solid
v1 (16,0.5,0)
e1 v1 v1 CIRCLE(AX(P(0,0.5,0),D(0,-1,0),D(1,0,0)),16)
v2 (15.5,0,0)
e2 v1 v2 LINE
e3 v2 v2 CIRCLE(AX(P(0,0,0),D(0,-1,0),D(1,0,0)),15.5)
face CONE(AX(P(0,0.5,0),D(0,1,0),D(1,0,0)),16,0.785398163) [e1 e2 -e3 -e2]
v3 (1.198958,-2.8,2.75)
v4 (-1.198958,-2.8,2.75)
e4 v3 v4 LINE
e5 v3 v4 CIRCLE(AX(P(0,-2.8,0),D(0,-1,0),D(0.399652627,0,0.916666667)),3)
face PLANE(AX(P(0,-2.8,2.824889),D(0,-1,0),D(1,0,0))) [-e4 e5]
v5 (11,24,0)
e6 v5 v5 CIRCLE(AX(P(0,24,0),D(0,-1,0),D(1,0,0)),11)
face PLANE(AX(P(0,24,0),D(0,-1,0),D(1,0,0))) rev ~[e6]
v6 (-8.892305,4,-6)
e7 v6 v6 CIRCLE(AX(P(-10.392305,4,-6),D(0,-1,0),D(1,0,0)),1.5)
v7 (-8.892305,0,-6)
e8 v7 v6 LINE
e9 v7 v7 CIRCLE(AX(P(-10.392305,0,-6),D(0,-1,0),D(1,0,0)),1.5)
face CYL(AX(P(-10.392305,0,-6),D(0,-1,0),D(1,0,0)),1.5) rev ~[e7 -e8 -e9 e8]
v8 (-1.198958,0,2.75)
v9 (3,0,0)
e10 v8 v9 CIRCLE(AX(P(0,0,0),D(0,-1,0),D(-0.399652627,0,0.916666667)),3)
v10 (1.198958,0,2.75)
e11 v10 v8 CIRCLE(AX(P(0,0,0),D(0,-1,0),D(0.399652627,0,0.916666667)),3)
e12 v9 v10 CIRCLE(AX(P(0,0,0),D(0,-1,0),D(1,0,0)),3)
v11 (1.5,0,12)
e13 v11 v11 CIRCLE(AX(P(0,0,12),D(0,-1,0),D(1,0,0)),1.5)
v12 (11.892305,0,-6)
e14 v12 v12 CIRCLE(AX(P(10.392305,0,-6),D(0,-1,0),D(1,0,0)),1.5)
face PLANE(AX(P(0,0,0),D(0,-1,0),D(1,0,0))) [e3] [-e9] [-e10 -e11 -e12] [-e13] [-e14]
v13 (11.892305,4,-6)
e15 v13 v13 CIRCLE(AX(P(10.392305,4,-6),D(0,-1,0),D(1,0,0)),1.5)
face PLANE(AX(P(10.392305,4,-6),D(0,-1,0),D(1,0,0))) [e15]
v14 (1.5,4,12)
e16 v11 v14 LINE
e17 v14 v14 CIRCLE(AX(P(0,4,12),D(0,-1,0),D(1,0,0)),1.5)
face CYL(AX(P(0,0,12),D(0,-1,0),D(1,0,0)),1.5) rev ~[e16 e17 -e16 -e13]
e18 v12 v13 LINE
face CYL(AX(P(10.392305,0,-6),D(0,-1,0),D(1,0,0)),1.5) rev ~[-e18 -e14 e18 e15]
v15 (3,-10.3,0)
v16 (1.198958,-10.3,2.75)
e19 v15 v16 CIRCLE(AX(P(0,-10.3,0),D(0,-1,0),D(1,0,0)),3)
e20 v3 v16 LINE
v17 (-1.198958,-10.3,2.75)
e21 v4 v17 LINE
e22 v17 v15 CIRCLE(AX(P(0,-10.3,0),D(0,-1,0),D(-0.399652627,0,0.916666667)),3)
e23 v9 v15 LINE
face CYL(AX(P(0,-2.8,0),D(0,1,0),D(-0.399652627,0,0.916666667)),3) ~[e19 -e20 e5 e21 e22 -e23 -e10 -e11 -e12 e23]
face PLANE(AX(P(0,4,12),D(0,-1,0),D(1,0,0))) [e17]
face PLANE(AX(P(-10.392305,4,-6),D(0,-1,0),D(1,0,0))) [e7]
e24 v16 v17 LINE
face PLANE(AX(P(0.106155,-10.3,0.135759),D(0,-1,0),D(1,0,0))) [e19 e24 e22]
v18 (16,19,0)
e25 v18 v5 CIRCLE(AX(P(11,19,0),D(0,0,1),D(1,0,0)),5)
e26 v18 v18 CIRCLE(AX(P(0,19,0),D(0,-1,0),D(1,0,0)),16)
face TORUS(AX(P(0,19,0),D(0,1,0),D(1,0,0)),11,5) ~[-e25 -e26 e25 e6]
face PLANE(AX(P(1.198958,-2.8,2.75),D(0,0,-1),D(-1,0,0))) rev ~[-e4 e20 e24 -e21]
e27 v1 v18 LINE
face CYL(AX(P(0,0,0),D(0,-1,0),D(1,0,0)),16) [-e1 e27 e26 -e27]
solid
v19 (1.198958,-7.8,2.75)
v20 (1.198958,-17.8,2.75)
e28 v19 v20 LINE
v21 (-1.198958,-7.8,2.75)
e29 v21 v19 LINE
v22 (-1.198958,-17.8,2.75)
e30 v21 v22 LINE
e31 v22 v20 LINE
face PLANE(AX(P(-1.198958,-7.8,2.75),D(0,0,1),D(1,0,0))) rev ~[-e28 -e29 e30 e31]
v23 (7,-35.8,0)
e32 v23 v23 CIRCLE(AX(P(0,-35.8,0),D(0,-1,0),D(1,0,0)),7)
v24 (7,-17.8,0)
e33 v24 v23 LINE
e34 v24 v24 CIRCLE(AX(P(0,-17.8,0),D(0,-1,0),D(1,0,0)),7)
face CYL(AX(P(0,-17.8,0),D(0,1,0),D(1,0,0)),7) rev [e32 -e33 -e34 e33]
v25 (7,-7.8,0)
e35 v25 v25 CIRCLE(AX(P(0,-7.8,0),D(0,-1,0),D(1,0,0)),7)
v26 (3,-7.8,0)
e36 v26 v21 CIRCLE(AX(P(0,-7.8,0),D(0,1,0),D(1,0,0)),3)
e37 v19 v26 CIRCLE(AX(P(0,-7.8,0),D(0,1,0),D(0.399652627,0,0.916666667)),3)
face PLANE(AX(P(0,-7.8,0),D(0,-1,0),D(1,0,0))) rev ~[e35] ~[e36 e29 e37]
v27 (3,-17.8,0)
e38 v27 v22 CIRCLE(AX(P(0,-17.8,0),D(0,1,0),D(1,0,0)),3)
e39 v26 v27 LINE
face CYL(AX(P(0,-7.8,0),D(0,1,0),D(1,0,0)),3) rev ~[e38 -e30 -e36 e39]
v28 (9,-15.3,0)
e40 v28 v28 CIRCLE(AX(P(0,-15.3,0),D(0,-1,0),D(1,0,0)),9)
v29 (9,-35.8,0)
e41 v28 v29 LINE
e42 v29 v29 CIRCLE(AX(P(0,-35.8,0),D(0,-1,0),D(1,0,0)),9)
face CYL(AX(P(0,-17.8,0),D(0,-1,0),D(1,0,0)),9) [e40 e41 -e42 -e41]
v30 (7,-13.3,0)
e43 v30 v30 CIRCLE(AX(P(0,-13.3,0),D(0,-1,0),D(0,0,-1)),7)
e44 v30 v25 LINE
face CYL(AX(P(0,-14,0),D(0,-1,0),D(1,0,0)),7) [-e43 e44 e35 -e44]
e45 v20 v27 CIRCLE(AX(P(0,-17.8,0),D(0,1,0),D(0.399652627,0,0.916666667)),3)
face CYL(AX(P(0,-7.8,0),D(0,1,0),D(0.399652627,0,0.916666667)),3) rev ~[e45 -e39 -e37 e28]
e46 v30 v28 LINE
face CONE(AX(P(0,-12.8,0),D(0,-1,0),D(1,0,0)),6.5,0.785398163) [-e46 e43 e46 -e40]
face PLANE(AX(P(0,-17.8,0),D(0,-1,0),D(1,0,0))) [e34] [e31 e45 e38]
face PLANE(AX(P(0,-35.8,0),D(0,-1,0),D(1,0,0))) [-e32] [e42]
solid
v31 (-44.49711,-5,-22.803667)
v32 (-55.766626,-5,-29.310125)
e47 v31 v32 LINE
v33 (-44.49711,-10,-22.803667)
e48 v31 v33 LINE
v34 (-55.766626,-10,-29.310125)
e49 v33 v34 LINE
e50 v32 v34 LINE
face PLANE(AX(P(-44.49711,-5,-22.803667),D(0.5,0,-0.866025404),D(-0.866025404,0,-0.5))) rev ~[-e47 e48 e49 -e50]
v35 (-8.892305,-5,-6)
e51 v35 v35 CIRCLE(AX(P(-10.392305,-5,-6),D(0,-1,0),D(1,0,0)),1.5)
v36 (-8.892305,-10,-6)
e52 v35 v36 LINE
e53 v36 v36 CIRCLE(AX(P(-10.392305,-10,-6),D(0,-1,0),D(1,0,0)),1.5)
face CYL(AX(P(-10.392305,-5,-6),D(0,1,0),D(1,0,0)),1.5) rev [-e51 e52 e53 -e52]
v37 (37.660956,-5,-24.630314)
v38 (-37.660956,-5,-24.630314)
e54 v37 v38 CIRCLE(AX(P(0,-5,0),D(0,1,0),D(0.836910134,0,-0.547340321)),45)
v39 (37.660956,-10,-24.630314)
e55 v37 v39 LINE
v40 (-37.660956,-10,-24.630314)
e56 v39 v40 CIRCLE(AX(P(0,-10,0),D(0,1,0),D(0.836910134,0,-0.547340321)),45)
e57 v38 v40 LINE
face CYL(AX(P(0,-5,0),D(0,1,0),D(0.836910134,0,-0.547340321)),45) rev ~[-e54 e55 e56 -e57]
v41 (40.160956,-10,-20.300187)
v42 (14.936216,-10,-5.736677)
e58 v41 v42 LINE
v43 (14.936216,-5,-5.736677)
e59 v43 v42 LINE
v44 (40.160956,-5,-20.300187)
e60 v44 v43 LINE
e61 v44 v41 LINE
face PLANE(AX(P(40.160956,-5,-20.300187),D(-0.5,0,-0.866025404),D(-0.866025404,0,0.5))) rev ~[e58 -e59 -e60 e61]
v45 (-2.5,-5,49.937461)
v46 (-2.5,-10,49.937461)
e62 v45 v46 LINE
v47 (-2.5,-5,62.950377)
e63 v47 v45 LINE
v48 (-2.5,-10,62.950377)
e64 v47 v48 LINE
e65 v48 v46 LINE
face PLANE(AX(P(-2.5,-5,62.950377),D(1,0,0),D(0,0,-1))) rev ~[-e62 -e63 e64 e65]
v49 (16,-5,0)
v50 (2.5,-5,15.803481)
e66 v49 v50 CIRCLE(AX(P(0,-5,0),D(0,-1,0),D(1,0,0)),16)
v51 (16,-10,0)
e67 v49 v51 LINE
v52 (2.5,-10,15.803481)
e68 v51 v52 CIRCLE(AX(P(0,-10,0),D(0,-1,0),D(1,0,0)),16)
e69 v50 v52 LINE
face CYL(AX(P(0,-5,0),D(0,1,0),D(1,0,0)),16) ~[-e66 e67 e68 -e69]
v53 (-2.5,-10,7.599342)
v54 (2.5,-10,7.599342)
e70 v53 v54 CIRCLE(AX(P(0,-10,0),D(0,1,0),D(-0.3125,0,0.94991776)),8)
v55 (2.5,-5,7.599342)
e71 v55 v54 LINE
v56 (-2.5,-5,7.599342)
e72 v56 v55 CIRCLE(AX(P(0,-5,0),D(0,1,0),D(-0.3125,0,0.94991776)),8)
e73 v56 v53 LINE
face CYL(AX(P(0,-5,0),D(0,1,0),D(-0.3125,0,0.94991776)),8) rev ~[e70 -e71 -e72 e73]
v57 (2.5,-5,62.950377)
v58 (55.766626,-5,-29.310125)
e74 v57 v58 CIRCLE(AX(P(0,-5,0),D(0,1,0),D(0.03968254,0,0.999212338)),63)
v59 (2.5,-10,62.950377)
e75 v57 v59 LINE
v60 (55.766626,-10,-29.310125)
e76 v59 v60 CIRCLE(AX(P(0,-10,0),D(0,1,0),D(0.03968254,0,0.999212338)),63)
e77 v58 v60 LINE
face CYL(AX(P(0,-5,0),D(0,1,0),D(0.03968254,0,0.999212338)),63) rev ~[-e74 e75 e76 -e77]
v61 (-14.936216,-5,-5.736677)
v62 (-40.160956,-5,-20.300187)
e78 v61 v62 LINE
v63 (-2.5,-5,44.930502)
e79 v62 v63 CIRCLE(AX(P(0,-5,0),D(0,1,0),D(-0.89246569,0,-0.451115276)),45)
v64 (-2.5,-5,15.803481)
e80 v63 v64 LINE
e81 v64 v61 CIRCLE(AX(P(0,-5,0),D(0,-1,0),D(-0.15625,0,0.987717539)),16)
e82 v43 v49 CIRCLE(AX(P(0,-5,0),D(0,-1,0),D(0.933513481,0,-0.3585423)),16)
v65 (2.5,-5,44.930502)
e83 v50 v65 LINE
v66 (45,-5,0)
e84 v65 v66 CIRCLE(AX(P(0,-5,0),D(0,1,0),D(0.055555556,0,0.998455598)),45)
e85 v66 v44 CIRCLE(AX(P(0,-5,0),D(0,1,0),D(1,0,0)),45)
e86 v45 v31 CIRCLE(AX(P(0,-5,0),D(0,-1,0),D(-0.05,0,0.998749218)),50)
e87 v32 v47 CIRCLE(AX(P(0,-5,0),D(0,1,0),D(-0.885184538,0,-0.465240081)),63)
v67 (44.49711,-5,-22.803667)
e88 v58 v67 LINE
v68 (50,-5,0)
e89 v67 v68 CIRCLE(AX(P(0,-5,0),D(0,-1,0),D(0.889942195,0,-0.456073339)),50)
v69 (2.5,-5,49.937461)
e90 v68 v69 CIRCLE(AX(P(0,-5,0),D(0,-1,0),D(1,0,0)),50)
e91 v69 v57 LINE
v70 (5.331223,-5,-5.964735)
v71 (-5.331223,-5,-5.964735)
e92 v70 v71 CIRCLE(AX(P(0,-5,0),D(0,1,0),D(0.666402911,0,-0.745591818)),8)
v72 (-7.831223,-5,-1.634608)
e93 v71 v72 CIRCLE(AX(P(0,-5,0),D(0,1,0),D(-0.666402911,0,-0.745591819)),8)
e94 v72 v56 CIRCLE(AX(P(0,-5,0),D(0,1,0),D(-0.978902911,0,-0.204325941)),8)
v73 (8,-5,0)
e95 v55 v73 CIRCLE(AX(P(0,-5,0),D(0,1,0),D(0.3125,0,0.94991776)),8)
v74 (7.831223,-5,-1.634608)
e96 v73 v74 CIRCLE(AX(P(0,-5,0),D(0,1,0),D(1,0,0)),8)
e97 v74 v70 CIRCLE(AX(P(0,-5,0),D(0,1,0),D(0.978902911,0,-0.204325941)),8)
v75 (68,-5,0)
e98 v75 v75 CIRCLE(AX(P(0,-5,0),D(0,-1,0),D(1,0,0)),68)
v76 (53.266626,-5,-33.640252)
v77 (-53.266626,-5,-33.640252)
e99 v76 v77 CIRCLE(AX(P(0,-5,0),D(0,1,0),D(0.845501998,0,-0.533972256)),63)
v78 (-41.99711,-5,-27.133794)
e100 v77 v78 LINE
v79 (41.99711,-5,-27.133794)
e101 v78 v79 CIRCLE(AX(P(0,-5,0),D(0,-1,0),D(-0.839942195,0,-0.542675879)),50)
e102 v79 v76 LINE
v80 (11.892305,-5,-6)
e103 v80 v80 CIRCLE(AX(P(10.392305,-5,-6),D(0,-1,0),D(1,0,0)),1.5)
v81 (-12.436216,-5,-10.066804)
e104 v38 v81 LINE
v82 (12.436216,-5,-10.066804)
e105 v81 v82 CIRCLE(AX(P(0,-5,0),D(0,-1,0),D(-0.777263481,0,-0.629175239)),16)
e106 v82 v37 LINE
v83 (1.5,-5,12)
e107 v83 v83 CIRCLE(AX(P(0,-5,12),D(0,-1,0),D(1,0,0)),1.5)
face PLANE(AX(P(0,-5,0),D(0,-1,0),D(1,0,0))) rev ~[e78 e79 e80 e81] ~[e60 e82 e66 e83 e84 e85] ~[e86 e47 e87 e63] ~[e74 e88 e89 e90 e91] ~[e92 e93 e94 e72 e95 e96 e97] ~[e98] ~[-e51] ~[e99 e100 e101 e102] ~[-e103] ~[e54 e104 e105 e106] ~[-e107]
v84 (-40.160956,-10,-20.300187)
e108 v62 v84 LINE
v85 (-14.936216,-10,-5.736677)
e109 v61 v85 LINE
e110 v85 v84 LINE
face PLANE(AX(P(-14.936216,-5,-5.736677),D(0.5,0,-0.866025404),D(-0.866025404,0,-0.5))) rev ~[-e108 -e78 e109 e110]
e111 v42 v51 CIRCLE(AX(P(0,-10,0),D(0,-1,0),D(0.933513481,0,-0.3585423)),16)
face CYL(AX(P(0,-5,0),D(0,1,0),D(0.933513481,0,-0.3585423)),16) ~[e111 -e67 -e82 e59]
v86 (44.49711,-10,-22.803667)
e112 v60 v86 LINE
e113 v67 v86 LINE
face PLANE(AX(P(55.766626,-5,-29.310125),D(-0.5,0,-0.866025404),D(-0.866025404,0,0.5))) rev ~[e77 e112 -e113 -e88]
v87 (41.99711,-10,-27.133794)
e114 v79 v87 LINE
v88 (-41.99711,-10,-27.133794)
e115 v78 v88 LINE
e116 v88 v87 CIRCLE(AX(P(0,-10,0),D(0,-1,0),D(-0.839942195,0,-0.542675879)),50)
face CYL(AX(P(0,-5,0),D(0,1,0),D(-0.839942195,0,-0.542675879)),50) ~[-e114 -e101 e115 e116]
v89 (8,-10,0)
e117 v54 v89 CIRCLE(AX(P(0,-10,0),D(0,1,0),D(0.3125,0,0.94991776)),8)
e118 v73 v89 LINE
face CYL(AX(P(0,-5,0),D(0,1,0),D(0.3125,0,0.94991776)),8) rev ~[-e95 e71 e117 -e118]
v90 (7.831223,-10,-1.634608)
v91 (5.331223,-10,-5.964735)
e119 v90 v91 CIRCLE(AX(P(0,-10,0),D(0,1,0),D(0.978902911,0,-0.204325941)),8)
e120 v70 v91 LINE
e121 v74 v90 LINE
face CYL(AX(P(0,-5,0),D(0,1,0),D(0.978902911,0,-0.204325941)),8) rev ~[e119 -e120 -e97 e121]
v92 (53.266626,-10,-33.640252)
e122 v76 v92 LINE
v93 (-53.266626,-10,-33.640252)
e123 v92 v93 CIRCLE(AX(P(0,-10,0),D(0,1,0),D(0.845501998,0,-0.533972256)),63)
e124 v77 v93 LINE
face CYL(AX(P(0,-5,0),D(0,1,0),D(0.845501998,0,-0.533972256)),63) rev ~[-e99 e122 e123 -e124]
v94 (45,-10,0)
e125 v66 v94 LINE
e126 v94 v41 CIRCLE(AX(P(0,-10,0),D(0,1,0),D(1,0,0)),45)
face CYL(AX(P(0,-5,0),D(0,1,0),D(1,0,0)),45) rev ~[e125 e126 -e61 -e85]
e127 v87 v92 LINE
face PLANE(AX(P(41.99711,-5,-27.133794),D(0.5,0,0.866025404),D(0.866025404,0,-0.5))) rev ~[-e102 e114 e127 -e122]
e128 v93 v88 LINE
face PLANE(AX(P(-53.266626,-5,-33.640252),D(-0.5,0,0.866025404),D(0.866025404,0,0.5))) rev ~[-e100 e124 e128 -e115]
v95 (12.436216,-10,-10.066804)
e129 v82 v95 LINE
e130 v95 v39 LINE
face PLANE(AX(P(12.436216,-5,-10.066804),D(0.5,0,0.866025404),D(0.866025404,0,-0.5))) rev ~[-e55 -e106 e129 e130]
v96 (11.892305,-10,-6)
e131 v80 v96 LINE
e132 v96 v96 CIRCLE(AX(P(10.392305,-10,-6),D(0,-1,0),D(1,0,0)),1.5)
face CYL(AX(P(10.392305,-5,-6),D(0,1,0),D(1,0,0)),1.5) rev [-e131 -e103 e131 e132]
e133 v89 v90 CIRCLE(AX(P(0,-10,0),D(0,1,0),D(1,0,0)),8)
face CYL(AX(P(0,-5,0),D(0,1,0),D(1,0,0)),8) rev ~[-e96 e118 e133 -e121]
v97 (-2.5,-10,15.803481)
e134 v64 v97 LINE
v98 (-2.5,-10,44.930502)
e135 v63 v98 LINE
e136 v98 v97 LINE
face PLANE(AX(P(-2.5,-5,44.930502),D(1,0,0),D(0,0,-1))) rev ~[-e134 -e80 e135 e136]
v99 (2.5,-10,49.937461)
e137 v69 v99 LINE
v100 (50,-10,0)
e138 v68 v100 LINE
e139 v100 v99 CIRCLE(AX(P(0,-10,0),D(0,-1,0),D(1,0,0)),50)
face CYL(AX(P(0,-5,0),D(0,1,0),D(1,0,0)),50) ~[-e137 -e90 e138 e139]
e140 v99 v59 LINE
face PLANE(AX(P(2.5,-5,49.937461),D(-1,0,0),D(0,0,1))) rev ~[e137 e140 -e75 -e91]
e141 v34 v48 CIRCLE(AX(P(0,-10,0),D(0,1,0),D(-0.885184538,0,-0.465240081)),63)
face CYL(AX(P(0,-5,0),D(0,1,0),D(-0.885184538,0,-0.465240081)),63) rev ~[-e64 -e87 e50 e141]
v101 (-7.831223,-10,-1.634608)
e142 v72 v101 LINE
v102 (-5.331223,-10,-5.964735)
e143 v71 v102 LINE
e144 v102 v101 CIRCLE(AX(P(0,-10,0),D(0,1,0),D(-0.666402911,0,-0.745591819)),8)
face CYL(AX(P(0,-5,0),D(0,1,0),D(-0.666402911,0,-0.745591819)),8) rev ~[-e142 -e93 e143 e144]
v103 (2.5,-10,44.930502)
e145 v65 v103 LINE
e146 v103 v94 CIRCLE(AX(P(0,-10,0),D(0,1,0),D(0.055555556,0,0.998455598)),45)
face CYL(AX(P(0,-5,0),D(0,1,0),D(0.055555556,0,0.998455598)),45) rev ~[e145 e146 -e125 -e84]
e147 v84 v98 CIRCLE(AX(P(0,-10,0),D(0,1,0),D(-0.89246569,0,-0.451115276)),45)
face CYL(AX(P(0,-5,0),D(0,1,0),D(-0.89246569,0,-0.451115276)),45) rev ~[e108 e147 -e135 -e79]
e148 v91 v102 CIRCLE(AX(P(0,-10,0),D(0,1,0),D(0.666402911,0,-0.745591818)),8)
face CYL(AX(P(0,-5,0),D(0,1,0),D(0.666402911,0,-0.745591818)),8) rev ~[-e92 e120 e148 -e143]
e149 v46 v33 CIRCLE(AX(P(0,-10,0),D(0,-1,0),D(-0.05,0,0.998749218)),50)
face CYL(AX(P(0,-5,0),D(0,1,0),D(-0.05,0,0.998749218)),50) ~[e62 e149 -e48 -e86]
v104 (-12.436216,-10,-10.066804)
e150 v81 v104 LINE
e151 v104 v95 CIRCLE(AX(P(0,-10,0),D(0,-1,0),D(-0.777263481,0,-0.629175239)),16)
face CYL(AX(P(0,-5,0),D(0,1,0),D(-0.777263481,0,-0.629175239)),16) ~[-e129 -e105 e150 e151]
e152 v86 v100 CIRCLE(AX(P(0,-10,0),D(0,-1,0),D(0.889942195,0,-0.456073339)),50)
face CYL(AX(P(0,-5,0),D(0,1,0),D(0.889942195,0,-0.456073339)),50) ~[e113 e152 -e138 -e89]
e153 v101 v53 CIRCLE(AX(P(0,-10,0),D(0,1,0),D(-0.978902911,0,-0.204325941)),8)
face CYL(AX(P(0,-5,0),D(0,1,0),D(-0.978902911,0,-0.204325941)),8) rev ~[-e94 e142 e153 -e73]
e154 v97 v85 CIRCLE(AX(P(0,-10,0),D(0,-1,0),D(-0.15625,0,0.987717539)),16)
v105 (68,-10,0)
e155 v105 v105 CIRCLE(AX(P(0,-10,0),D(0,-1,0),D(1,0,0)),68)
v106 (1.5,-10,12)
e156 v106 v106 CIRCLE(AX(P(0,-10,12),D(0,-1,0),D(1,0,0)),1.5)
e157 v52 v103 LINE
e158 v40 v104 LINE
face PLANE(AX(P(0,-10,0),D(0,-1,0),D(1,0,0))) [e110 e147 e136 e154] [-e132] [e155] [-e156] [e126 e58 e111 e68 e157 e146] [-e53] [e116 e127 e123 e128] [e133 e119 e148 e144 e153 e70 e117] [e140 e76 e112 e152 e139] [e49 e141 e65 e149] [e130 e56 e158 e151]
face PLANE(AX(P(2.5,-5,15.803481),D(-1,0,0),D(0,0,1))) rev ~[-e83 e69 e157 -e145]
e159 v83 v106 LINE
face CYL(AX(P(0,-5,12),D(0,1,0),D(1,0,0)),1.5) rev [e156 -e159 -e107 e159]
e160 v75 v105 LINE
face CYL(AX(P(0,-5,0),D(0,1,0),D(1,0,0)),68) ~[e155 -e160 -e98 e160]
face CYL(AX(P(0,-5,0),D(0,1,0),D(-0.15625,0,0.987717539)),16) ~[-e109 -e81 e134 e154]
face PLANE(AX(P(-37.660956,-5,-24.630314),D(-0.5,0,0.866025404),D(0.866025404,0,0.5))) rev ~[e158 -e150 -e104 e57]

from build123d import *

# Parameters (mm, degrees)
F0_R           = 16
F0_R_2         = 1.5
F0_R_3         = 8
F1_DEPTH       = 24
F2_DEPTH       = 4
F3_DEPTH       = 2.8
F5_DEPTH       = 7.5
F6_R           = 5
F7_SIZE        = 0.5
F9_START       = 5
F8_R           = 7
F9_DEPTH       = 10
F10_R          = 9
F10_R_2        = 7
F11_DEPTH      = 18
F11_DEPTH_BACK = 5
F12_S5_R       = 7
F12_T6_DEPTH   = 14
F14_R          = 68
F14_R_2        = 1.5
F15_DEPTH      = 5


# Not quite as in the source:
# - a fillet or chamfer that OpenCascade refuses, or shapes differently, is made with other operations: its cross-section is extruded or revolved along the edge and cut away or added


with BuildPart() as f1:
    # F0 (on Front) → F1 (new body)
    with BuildSketch(Plane.XZ):
        Circle(F0_R)
        with Locations((-10.3923048454, -6)):
            Circle(F0_R_2, mode=Mode.SUBTRACT)
        with Locations((10.3923048454, -6)):
            Circle(F0_R_2, mode=Mode.SUBTRACT)
        Circle(F0_R_3, mode=Mode.SUBTRACT)
        with Locations((0, 12)):
            Circle(F0_R_2, mode=Mode.SUBTRACT)
        Circle(F0_R_3)
        with BuildLine():
            ThreePointArc((1.1989578808, 2.75), (2.5096686676, 1.6436432638), (3, 0))
            ThreePointArc((3, 0), (-1.6436432638, -2.5096686676), (-1.1989578808, 2.75))
            ThreePointArc((-1.1989578808, 2.75), (0, 3), (1.1989578808, 2.75))
        make_face(mode=Mode.SUBTRACT)
        with Locations((10.3923048454, -6)):
            Circle(F0_R_2)
        with Locations((-10.3923048454, -6)):
            Circle(F0_R_2)
        with Locations((0, 12)):
            Circle(F0_R_2)
        with BuildLine():
            Line((-1.1989578808, 2.75), (1.1989578808, 2.75))
            ThreePointArc((1.1989578808, 2.75), (0, 3), (-1.1989578808, 2.75))
        make_face()
        with BuildLine():
            ThreePointArc((-1.1989578808, 2.75), (-1.6436432638, -2.5096686676), (3, 0))
            ThreePointArc((3, 0), (2.5096686676, 1.6436432638), (1.1989578808, 2.75))
            Line((1.1989578808, 2.75), (-1.1989578808, 2.75))
        make_face()
    extrude(amount=-F1_DEPTH)

    # F0 (on Front) → F2 (cut)
    with BuildSketch(Plane.XZ):
        with Locations((-10.3923048454, -6)):
            Circle(F0_R_2)
        with Locations((0, 12)):
            Circle(F0_R_2)
        with Locations((10.3923048454, -6)):
            Circle(F0_R_2)
    extrude(amount=-F2_DEPTH, mode=Mode.SUBTRACT)

    # F0 (on Front) → F3 (join)
    with BuildSketch(Plane.XZ):
        with BuildLine():
            Line((-1.1989578808, 2.75), (1.1989578808, 2.75))
            ThreePointArc((1.1989578808, 2.75), (0, 3), (-1.1989578808, 2.75))
        make_face()
        with BuildLine():
            ThreePointArc((-1.1989578808, 2.75), (-1.6436432638, -2.5096686676), (3, 0))
            ThreePointArc((3, 0), (2.5096686676, 1.6436432638), (1.1989578808, 2.75))
            Line((1.1989578808, 2.75), (-1.1989578808, 2.75))
        make_face()
    extrude(amount=F3_DEPTH)

    # F4 (on face) → F5 (join)
    with BuildSketch(Plane.XZ.offset(2.8)):
        with BuildLine():
            ThreePointArc((-1.1989578808, 2.75), (-1.6436432638, -2.5096686676), (3, 0))
            ThreePointArc((3, 0), (2.5096686676, 1.6436432638), (1.1989578808, 2.75))
            Line((1.1989578808, 2.75), (-1.1989578808, 2.75))
        make_face()
    extrude(amount=F5_DEPTH)

    # F6
    f6_edges = [f1.edges().sort_by_distance(p)[0] for p in [
        (-16, 24, 0),
    ]]
    fillet(f6_edges, radius=F6_R)

    # F7
    f7_edges = [f1.edges().sort_by_distance(p)[0] for p in [
        (-16, 0, 0),
    ]]
    chamfer(f7_edges, length=F7_SIZE)


with BuildPart() as f9:
    # F8 (on face) → F9 (new body)
    with BuildSketch(Plane.XZ.offset(2.8).offset(F9_START)):
        Circle(F8_R)
        with BuildLine():
            ThreePointArc((1.1989578808, 2.75), (2.5096686676, 1.6436432638), (3, 0))
            ThreePointArc((3, 0), (-1.6436432638, -2.5096686676), (-1.1989578808, 2.75))
            ThreePointArc((-1.1989578808, 2.75), (0, 3), (1.1989578808, 2.75))
        make_face(mode=Mode.SUBTRACT)
        with BuildLine():
            Line((-1.1989578808, 2.75), (1.1989578808, 2.75))
            ThreePointArc((1.1989578808, 2.75), (0, 3), (-1.1989578808, 2.75))
        make_face()
    extrude(amount=F9_DEPTH)

    # F10 (on face) → F11 (join, two sides)
    with BuildSketch(Plane.XZ.offset(17.8)) as f11_sk:
        Circle(F10_R)
        Circle(F10_R_2, mode=Mode.SUBTRACT)
    extrude(amount=F11_DEPTH)
    extrude(f11_sk.sketch, amount=-F11_DEPTH_BACK)

    # F12: chamfer of 2.5 on 1 edges, made by hand


with BuildPart() as f12_tool2:
    # F12_s3 → F12_t4 (revolve)
    with BuildSketch(Plane.XY):
        Polygon((6.5, -12.8), (9, -15.3), (9, -12.8), align=None)
    revolve(axis=Axis((0, -12.8, 0), (0, -1, 0)))

    # F12_s5 → F12_t6 (cut, symmetric)
    with BuildSketch(Plane.XZ.offset(14)):
        Circle(F12_S5_R)
    extrude(amount=F12_T6_DEPTH, both=True, mode=Mode.SUBTRACT)


with BuildPart() as f9_1:
    add(f9.part)

    # F12_t1: cut F12_tool2
    add(f12_tool2.part, mode=Mode.SUBTRACT)


with BuildPart() as f15:
    # F14 (on offset) → F15 (new body)
    with BuildSketch(Plane.XZ.offset(5)):
        Circle(F14_R)
        with BuildLine():
            Line((2.5, 65.9391838022), (2.5, 62.9503772824))
            ThreePointArc((2.5, 62.9503772824), (45.4230117892, 43.6548966326), (63, 0))
            ThreePointArc((63, 0), (61.1649304421, -15.0947435888), (55.7666259044, -29.3101251318))
            Line((55.7666259044, -29.3101251318), (58.3550082775, -30.8045283916))
            Line((58.3550082775, -30.8045283916), (55.8550082775, -35.1346554106))
            Line((55.8550082775, -35.1346554106), (53.2666259044, -33.6402521507))
            ThreePointArc((53.2666259044, -33.6402521507), (0, -63), (-53.2666259044, -33.6402521507))
            Line((-53.2666259044, -33.6402521507), (-55.8550082775, -35.1346554106))
            Line((-55.8550082775, -35.1346554106), (-58.3550082775, -30.8045283916))
            Line((-58.3550082775, -30.8045283916), (-55.7666259044, -29.3101251318))
            ThreePointArc((-55.7666259044, -29.3101251318), (-54.5596004384, 31.5), (-2.5, 62.9503772824))
            Line((-2.5, 62.9503772824), (-2.5, 65.9391838022))
            Line((-2.5, 65.9391838022), (2.5, 65.9391838022))
        make_face(mode=Mode.SUBTRACT)
        with BuildLine():
            ThreePointArc((-40.1609560407, -20.3001874351), (-38.9711431703, 22.5), (-2.5, 44.930501889))
            Line((-2.5, 44.930501889), (-2.5, 49.9374608886))
            ThreePointArc((-2.5, 49.9374608886), (-43.3012701892, 25), (-44.49710973, -22.8036669348))
            Line((-44.49710973, -22.8036669348), (-40.1609560407, -20.3001874351))
        make_face()
        with BuildLine():
            Line((41.99710973, -27.1337939538), (37.6609560407, -24.630314454))
            ThreePointArc((37.6609560407, -24.630314454), (0, -45), (-37.6609560407, -24.630314454))
            Line((-37.6609560407, -24.630314454), (-41.99710973, -27.1337939538))
            ThreePointArc((-41.99710973, -27.1337939538), (0, -50), (41.99710973, -27.1337939538))
        make_face()
        with BuildLine():
            Line((2.5, 49.9374608886), (2.5, 44.930501889))
            ThreePointArc((2.5, 44.930501889), (32.6917420766, 30.9232921921), (45, 0))
            ThreePointArc((45, 0), (43.7735252283, -10.4344855688), (40.1609560407, -20.3001874351))
            Line((40.1609560407, -20.3001874351), (44.49710973, -22.8036669348))
            ThreePointArc((44.49710973, -22.8036669348), (48.6048119351, -11.729120033), (50, 0))
            ThreePointArc((50, 0), (36.2284418655, 34.4601218802), (2.5, 49.9374608886))
        make_face()
        with BuildLine():
            ThreePointArc((14.9362156932, -5.7366768052), (15.7318061756, -2.9172374697), (16, 0))
            ThreePointArc((16, 0), (12.1655250606, 10.3923048454), (2.5, 15.8034806293))
            Line((2.5, 15.8034806293), (2.5, 7.5993420768))
            ThreePointArc((2.5, 7.5993420768), (6.4807406984, 4.6904157598), (8, 0))
            ThreePointArc((8, 0), (7.9576939601, -0.8216488531), (7.8312232905, -1.6346075289))
            Line((7.8312232905, -1.6346075289), (14.9362156932, -5.7366768052))
        make_face()
        with BuildLine():
            Line((-2.5, 7.5993420768), (-2.5, 15.8034806293))
            ThreePointArc((-2.5, 15.8034806293), (-13.8564064606, 8), (-14.9362156932, -5.7366768052))
            Line((-14.9362156932, -5.7366768052), (-7.8312232905, -1.6346075289))
            ThreePointArc((-7.8312232905, -1.6346075289), (-6.9282032303, 4), (-2.5, 7.5993420768))
        make_face()
        with BuildLine():
            ThreePointArc((-12.4362156932, -10.0668038241), (0, -16), (12.4362156932, -10.0668038241))
            Line((12.4362156932, -10.0668038241), (5.3312232905, -5.9647345479))
            ThreePointArc((5.3312232905, -5.9647345479), (0, -8), (-5.3312232905, -5.9647345479))
            Line((-5.3312232905, -5.9647345479), (-12.4362156932, -10.0668038241))
        make_face()
        with BuildLine():
            ThreePointArc((-12.4362156932, -10.0668038241), (-13.8564064606, -8), (-14.9362156932, -5.7366768052))
            Line((-14.9362156932, -5.7366768052), (-40.1609560407, -20.3001874351))
            ThreePointArc((-40.1609560407, -20.3001874351), (-38.9711431703, -22.5), (-37.6609560407, -24.630314454))
            Line((-37.6609560407, -24.630314454), (-12.4362156932, -10.0668038241))
        make_face()
        with BuildLine():
            Line((40.1609560407, -20.3001874351), (14.9362156932, -5.7366768052))
            ThreePointArc((14.9362156932, -5.7366768052), (13.8564064606, -8), (12.4362156932, -10.0668038241))
            Line((12.4362156932, -10.0668038241), (37.6609560407, -24.630314454))
            ThreePointArc((37.6609560407, -24.630314454), (38.9711431703, -22.5), (40.1609560407, -20.3001874351))
        make_face()
        with BuildLine():
            ThreePointArc((-2.5, 15.8034806293), (0, 16), (2.5, 15.8034806293))
            Line((2.5, 15.8034806293), (2.5, 44.930501889))
            ThreePointArc((2.5, 44.930501889), (0, 45), (-2.5, 44.930501889))
            Line((-2.5, 44.930501889), (-2.5, 15.8034806293))
        make_face()
        with BuildLine():
            ThreePointArc((-41.99710973, -27.1337939538), (-43.3012701892, -25), (-44.49710973, -22.8036669348))
            Line((-44.49710973, -22.8036669348), (-55.7666259044, -29.3101251318))
            ThreePointArc((-55.7666259044, -29.3101251318), (-54.5596004384, -31.5), (-53.2666259044, -33.6402521507))
            Line((-53.2666259044, -33.6402521507), (-41.99710973, -27.1337939538))
        make_face()
        with BuildLine():
            Line((55.7666259044, -29.3101251318), (44.49710973, -22.8036669348))
            ThreePointArc((44.49710973, -22.8036669348), (43.3012701892, -25), (41.99710973, -27.1337939538))
            Line((41.99710973, -27.1337939538), (53.2666259044, -33.6402521507))
            ThreePointArc((53.2666259044, -33.6402521507), (54.5596004384, -31.5), (55.7666259044, -29.3101251318))
        make_face()
        with BuildLine():
            ThreePointArc((-2.5, 49.9374608886), (0, 50), (2.5, 49.9374608886))
            Line((2.5, 49.9374608886), (2.5, 62.9503772824))
            ThreePointArc((2.5, 62.9503772824), (0, 63), (-2.5, 62.9503772824))
            Line((-2.5, 62.9503772824), (-2.5, 49.9374608886))
        make_face()
        with BuildLine():
            Line((2.5, 7.5993420768), (2.5, 15.8034806293))
            ThreePointArc((2.5, 15.8034806293), (0, 16), (-2.5, 15.8034806293))
            Line((-2.5, 15.8034806293), (-2.5, 7.5993420768))
            ThreePointArc((-2.5, 7.5993420768), (0, 8), (2.5, 7.5993420768))
        make_face()
        with Locations((0, 12)):
            Circle(F14_R_2, mode=Mode.SUBTRACT)
        with BuildLine():
            Line((-7.8312232905, -1.6346075289), (-14.9362156932, -5.7366768052))
            ThreePointArc((-14.9362156932, -5.7366768052), (-13.8564064606, -8), (-12.4362156932, -10.0668038241))
            Line((-12.4362156932, -10.0668038241), (-5.3312232905, -5.9647345479))
            ThreePointArc((-5.3312232905, -5.9647345479), (-6.9282032303, -4), (-7.8312232905, -1.6346075289))
        make_face()
        with Locations((-10.3923048454, -6)):
            Circle(F14_R_2, mode=Mode.SUBTRACT)
        with BuildLine():
            ThreePointArc((12.4362156932, -10.0668038241), (13.8564064606, -8), (14.9362156932, -5.7366768052))
            Line((14.9362156932, -5.7366768052), (7.8312232905, -1.6346075289))
            ThreePointArc((7.8312232905, -1.6346075289), (6.9282032303, -4), (5.3312232905, -5.9647345479))
            Line((5.3312232905, -5.9647345479), (12.4362156932, -10.0668038241))
        make_face()
        with Locations((10.3923048454, -6)):
            Circle(F14_R_2, mode=Mode.SUBTRACT)
        with BuildLine():
            ThreePointArc((-37.6609560407, -24.630314454), (-38.9711431703, -22.5), (-40.1609560407, -20.3001874351))
            Line((-40.1609560407, -20.3001874351), (-44.49710973, -22.8036669348))
            ThreePointArc((-44.49710973, -22.8036669348), (-43.3012701892, -25), (-41.99710973, -27.1337939538))
            Line((-41.99710973, -27.1337939538), (-37.6609560407, -24.630314454))
        make_face()
        with BuildLine():
            Line((44.49710973, -22.8036669348), (40.1609560407, -20.3001874351))
            ThreePointArc((40.1609560407, -20.3001874351), (38.9711431703, -22.5), (37.6609560407, -24.630314454))
            Line((37.6609560407, -24.630314454), (41.99710973, -27.1337939538))
            ThreePointArc((41.99710973, -27.1337939538), (43.3012701892, -25), (44.49710973, -22.8036669348))
        make_face()
        with BuildLine():
            ThreePointArc((-2.5, 44.930501889), (0, 45), (2.5, 44.930501889))
            Line((2.5, 44.930501889), (2.5, 49.9374608886))
            ThreePointArc((2.5, 49.9374608886), (0, 50), (-2.5, 49.9374608886))
            Line((-2.5, 49.9374608886), (-2.5, 44.930501889))
        make_face()
        with BuildLine():
            ThreePointArc((-2.5, 62.9503772824), (0, 63), (2.5, 62.9503772824))
            Line((2.5, 62.9503772824), (2.5, 65.9391838022))
            Line((2.5, 65.9391838022), (-2.5, 65.9391838022))
            Line((-2.5, 65.9391838022), (-2.5, 62.9503772824))
        make_face()
        with BuildLine():
            ThreePointArc((-53.2666259044, -33.6402521507), (-54.5596004384, -31.5), (-55.7666259044, -29.3101251318))
            Line((-55.7666259044, -29.3101251318), (-58.3550082775, -30.8045283916))
            Line((-58.3550082775, -30.8045283916), (-55.8550082775, -35.1346554106))
            Line((-55.8550082775, -35.1346554106), (-53.2666259044, -33.6402521507))
        make_face()
        with BuildLine():
            Line((58.3550082775, -30.8045283916), (55.7666259044, -29.3101251318))
            ThreePointArc((55.7666259044, -29.3101251318), (54.5596004384, -31.5), (53.2666259044, -33.6402521507))
            Line((53.2666259044, -33.6402521507), (55.8550082775, -35.1346554106))
            Line((55.8550082775, -35.1346554106), (58.3550082775, -30.8045283916))
        make_face()
    extrude(amount=F15_DEPTH)


solid = Compound([f1.part, f9_1.part, f15.part])
